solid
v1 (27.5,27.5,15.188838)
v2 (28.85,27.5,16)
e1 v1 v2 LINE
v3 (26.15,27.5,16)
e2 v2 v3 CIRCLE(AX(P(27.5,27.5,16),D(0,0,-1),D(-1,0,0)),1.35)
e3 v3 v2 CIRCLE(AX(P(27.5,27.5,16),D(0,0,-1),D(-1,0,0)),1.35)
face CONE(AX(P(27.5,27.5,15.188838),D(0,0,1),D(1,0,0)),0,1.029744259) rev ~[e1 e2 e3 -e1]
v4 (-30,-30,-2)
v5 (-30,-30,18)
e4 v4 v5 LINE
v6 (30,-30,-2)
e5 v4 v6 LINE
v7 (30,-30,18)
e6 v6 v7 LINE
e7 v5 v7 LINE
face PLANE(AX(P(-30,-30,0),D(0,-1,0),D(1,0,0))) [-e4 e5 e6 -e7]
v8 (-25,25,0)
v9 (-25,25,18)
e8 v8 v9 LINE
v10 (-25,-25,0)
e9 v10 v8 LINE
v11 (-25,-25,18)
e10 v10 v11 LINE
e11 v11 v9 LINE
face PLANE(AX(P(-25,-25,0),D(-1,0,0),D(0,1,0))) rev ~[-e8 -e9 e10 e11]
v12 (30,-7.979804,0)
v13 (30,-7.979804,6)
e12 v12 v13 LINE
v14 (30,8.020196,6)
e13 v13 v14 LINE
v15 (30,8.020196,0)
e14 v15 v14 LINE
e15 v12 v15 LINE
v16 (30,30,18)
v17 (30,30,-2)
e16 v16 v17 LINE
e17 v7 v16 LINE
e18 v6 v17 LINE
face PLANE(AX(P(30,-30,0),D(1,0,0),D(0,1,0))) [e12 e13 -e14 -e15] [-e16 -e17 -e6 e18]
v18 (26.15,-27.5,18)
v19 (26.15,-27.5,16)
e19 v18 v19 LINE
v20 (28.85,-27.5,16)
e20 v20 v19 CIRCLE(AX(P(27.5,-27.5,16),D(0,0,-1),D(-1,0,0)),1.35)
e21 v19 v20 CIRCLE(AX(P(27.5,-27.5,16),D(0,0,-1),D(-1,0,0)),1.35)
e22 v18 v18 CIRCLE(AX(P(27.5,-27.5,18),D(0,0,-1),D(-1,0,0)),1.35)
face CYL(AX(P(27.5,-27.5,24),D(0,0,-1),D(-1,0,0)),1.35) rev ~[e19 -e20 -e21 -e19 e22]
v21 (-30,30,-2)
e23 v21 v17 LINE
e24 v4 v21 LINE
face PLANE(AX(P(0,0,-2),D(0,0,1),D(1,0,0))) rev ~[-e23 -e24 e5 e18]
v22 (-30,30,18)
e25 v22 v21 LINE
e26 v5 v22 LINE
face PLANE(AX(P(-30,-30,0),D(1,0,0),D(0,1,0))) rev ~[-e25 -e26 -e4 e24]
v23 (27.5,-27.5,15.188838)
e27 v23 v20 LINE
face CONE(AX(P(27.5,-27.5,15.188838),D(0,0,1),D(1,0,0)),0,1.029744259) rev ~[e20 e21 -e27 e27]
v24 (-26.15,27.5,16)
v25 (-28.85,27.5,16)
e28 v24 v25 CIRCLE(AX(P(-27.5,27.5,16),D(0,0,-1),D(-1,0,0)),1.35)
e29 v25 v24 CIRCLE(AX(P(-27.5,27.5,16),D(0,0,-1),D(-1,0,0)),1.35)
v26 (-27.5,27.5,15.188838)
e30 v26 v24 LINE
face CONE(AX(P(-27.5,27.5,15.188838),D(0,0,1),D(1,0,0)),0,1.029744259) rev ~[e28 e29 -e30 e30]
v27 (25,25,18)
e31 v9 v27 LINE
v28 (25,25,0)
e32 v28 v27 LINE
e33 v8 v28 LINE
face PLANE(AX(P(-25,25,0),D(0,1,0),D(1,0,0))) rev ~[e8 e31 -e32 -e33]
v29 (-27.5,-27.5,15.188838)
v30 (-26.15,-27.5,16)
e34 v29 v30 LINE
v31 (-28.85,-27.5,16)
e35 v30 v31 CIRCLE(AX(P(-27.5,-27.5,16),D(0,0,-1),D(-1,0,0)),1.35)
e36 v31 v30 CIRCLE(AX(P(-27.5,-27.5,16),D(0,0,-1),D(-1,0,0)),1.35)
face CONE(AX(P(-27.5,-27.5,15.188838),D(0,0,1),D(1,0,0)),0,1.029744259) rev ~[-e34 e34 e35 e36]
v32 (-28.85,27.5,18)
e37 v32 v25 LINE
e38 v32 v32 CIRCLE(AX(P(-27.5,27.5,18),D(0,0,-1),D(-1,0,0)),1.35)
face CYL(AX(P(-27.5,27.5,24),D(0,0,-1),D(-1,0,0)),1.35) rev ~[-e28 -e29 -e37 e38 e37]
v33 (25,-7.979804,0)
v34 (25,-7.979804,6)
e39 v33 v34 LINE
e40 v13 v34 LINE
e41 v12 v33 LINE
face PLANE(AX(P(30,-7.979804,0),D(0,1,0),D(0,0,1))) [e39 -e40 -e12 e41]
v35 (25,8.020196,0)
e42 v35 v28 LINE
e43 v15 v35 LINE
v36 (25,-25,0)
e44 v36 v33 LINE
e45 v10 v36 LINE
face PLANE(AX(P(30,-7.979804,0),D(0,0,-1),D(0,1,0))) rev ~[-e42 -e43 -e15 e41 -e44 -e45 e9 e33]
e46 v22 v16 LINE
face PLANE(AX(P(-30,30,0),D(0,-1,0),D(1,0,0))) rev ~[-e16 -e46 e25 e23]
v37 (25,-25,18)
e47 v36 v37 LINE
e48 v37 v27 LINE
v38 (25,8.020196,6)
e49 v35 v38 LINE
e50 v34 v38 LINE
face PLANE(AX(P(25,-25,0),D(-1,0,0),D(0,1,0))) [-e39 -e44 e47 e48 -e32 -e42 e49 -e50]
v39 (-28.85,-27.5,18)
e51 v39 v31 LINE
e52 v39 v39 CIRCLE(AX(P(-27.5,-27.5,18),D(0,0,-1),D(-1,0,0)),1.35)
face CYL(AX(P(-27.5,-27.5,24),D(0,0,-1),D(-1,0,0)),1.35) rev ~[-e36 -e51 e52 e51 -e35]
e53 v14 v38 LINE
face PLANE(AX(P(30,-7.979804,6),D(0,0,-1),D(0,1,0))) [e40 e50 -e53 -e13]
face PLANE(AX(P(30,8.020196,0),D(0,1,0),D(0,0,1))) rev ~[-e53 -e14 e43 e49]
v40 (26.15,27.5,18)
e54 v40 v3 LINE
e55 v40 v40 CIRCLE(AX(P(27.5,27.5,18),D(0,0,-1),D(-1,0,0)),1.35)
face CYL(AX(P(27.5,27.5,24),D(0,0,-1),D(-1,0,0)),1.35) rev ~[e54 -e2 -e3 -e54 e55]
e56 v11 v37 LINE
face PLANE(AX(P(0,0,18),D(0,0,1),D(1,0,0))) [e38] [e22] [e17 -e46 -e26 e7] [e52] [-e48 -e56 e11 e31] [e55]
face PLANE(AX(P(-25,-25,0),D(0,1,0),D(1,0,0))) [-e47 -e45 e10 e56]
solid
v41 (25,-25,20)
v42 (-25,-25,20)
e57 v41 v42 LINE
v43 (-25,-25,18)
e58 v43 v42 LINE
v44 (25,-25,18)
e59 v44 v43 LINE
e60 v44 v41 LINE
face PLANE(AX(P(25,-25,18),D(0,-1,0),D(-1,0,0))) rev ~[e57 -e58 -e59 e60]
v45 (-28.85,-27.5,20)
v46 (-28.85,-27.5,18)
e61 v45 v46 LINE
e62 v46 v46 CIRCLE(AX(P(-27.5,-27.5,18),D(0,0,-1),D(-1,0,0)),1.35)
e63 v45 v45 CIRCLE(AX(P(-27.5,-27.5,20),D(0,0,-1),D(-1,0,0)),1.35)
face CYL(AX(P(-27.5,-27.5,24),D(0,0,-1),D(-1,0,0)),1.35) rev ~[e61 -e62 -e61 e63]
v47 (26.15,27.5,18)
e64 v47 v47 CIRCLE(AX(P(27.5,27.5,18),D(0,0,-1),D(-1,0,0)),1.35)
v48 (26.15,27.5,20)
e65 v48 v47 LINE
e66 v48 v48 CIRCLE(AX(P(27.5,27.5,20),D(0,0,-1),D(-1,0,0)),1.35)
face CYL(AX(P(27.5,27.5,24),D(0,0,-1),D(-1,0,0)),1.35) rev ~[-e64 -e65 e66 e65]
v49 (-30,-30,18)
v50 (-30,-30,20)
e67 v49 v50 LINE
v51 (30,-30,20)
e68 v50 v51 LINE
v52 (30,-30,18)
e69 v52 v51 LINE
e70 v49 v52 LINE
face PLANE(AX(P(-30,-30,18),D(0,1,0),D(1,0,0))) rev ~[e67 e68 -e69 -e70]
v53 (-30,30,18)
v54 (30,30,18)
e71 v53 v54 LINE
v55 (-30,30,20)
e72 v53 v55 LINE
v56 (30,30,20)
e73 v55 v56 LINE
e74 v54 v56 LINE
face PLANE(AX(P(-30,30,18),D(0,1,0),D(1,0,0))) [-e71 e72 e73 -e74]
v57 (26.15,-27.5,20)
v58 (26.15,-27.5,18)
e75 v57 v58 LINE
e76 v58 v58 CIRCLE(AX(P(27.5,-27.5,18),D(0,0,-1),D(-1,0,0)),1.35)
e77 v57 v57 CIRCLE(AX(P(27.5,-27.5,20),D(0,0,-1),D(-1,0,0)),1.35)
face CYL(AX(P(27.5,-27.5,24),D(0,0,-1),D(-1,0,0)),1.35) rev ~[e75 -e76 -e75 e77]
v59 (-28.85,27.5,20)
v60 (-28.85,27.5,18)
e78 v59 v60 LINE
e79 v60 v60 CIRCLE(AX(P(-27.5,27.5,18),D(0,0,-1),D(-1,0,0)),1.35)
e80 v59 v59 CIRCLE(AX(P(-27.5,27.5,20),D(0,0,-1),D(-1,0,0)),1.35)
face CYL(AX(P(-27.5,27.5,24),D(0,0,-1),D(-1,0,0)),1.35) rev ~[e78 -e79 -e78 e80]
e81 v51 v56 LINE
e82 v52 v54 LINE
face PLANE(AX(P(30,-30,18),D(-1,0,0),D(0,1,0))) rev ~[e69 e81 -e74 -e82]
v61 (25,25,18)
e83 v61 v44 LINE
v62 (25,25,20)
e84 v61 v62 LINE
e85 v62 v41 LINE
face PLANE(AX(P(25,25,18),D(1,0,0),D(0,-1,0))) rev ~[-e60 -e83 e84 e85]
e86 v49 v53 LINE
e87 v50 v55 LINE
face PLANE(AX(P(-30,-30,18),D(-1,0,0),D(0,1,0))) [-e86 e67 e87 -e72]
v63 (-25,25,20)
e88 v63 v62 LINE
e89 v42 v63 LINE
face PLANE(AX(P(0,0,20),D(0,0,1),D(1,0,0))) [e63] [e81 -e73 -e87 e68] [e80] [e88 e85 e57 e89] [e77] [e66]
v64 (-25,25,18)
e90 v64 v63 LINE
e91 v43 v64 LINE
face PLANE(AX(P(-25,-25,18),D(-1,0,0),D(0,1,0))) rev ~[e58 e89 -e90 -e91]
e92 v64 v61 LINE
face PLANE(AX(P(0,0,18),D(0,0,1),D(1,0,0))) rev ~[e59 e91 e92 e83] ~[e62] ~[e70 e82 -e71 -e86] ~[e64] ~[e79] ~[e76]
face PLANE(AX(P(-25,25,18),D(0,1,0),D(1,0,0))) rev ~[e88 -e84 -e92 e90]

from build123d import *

# Parameters (mm, degrees)
F0_W       = 60
F0_H       = 60
F0_W_2     = 50
F0_H_2     = 50
F1_DEPTH   = 18
F2_DEPTH   = 2
F3_W       = 16
F3_H       = 6
F4_DEPTH   = 5
F5_W       = 60
F5_H       = 60
F6_DEPTH   = 2
F9_D       = 2.7
F9_DEPTH   = 4
F9_TIP     = 0.8111618357
F9_2_D     = 2.7
F9_2_DEPTH = 4
F9_2_TIP   = 0.8111618357


# Not quite as in the source:
# - a feature names something its author has since deleted; it is built from what else it names


with BuildPart() as f1:
    # F0 (on Top) → F1 (new body)
    with BuildSketch(Plane.XY):
        Rectangle(F0_W, F0_H)
        Rectangle(F0_W_2, F0_H_2, mode=Mode.SUBTRACT)
    extrude(amount=F1_DEPTH)

    # F0 (on Top) → F2 (join)
    with BuildSketch(Plane.XY):
        Rectangle(F0_W, F0_H)
        Rectangle(F0_W_2, F0_H_2, mode=Mode.SUBTRACT)
        Rectangle(F0_W_2, F0_H_2)
    extrude(amount=-F2_DEPTH)

    # F3 (on face) → F4 (cut, through all)
    with BuildSketch(Plane.YZ.offset(30)):
        with Locations((0.0201961273, 3)):
            Rectangle(F3_W, F3_H)
    extrude(amount=-F4_DEPTH, mode=Mode.SUBTRACT)

    # F9
    with Locations(Plane.XY.offset(20)):
        with Locations((-27.5, 27.5), (27.5, 27.5), (-27.5, -27.5), (27.5, -27.5)):
            Hole(F9_D / 2, depth=F9_DEPTH)
            with Locations((0, 0, -(F9_DEPTH + F9_TIP / 2))):  # 118° drill point
                Cone(0, F9_D / 2, F9_TIP, mode=Mode.SUBTRACT)


with BuildPart() as f6:
    # F5 (on face) → F6 (new body)
    with BuildSketch(Plane.XY.offset(18)):
        Rectangle(F5_W, F5_H)
        Polygon((25, 21.5), (25, 17.5), (25, -17.5), (25, -21.5), (25, -25), (-25, -25), (-25, -21.5), (-25, -17.5), (-25, 17.5), (-25, 21.5), (-25, 25), (25, 25), align=None, mode=Mode.SUBTRACT)
    extrude(amount=F6_DEPTH)

    # F9#2
    with Locations(Plane.XY.offset(20)):
        with Locations((-27.5, 27.5), (27.5, 27.5), (-27.5, -27.5), (27.5, -27.5)):
            Hole(F9_2_D / 2, depth=F9_2_DEPTH)
            with Locations((0, 0, -(F9_2_DEPTH + F9_2_TIP / 2))):  # 118° drill point
                Cone(0, F9_2_D / 2, F9_2_TIP, mode=Mode.SUBTRACT)


solid = Compound([f1.part, f6.part])
